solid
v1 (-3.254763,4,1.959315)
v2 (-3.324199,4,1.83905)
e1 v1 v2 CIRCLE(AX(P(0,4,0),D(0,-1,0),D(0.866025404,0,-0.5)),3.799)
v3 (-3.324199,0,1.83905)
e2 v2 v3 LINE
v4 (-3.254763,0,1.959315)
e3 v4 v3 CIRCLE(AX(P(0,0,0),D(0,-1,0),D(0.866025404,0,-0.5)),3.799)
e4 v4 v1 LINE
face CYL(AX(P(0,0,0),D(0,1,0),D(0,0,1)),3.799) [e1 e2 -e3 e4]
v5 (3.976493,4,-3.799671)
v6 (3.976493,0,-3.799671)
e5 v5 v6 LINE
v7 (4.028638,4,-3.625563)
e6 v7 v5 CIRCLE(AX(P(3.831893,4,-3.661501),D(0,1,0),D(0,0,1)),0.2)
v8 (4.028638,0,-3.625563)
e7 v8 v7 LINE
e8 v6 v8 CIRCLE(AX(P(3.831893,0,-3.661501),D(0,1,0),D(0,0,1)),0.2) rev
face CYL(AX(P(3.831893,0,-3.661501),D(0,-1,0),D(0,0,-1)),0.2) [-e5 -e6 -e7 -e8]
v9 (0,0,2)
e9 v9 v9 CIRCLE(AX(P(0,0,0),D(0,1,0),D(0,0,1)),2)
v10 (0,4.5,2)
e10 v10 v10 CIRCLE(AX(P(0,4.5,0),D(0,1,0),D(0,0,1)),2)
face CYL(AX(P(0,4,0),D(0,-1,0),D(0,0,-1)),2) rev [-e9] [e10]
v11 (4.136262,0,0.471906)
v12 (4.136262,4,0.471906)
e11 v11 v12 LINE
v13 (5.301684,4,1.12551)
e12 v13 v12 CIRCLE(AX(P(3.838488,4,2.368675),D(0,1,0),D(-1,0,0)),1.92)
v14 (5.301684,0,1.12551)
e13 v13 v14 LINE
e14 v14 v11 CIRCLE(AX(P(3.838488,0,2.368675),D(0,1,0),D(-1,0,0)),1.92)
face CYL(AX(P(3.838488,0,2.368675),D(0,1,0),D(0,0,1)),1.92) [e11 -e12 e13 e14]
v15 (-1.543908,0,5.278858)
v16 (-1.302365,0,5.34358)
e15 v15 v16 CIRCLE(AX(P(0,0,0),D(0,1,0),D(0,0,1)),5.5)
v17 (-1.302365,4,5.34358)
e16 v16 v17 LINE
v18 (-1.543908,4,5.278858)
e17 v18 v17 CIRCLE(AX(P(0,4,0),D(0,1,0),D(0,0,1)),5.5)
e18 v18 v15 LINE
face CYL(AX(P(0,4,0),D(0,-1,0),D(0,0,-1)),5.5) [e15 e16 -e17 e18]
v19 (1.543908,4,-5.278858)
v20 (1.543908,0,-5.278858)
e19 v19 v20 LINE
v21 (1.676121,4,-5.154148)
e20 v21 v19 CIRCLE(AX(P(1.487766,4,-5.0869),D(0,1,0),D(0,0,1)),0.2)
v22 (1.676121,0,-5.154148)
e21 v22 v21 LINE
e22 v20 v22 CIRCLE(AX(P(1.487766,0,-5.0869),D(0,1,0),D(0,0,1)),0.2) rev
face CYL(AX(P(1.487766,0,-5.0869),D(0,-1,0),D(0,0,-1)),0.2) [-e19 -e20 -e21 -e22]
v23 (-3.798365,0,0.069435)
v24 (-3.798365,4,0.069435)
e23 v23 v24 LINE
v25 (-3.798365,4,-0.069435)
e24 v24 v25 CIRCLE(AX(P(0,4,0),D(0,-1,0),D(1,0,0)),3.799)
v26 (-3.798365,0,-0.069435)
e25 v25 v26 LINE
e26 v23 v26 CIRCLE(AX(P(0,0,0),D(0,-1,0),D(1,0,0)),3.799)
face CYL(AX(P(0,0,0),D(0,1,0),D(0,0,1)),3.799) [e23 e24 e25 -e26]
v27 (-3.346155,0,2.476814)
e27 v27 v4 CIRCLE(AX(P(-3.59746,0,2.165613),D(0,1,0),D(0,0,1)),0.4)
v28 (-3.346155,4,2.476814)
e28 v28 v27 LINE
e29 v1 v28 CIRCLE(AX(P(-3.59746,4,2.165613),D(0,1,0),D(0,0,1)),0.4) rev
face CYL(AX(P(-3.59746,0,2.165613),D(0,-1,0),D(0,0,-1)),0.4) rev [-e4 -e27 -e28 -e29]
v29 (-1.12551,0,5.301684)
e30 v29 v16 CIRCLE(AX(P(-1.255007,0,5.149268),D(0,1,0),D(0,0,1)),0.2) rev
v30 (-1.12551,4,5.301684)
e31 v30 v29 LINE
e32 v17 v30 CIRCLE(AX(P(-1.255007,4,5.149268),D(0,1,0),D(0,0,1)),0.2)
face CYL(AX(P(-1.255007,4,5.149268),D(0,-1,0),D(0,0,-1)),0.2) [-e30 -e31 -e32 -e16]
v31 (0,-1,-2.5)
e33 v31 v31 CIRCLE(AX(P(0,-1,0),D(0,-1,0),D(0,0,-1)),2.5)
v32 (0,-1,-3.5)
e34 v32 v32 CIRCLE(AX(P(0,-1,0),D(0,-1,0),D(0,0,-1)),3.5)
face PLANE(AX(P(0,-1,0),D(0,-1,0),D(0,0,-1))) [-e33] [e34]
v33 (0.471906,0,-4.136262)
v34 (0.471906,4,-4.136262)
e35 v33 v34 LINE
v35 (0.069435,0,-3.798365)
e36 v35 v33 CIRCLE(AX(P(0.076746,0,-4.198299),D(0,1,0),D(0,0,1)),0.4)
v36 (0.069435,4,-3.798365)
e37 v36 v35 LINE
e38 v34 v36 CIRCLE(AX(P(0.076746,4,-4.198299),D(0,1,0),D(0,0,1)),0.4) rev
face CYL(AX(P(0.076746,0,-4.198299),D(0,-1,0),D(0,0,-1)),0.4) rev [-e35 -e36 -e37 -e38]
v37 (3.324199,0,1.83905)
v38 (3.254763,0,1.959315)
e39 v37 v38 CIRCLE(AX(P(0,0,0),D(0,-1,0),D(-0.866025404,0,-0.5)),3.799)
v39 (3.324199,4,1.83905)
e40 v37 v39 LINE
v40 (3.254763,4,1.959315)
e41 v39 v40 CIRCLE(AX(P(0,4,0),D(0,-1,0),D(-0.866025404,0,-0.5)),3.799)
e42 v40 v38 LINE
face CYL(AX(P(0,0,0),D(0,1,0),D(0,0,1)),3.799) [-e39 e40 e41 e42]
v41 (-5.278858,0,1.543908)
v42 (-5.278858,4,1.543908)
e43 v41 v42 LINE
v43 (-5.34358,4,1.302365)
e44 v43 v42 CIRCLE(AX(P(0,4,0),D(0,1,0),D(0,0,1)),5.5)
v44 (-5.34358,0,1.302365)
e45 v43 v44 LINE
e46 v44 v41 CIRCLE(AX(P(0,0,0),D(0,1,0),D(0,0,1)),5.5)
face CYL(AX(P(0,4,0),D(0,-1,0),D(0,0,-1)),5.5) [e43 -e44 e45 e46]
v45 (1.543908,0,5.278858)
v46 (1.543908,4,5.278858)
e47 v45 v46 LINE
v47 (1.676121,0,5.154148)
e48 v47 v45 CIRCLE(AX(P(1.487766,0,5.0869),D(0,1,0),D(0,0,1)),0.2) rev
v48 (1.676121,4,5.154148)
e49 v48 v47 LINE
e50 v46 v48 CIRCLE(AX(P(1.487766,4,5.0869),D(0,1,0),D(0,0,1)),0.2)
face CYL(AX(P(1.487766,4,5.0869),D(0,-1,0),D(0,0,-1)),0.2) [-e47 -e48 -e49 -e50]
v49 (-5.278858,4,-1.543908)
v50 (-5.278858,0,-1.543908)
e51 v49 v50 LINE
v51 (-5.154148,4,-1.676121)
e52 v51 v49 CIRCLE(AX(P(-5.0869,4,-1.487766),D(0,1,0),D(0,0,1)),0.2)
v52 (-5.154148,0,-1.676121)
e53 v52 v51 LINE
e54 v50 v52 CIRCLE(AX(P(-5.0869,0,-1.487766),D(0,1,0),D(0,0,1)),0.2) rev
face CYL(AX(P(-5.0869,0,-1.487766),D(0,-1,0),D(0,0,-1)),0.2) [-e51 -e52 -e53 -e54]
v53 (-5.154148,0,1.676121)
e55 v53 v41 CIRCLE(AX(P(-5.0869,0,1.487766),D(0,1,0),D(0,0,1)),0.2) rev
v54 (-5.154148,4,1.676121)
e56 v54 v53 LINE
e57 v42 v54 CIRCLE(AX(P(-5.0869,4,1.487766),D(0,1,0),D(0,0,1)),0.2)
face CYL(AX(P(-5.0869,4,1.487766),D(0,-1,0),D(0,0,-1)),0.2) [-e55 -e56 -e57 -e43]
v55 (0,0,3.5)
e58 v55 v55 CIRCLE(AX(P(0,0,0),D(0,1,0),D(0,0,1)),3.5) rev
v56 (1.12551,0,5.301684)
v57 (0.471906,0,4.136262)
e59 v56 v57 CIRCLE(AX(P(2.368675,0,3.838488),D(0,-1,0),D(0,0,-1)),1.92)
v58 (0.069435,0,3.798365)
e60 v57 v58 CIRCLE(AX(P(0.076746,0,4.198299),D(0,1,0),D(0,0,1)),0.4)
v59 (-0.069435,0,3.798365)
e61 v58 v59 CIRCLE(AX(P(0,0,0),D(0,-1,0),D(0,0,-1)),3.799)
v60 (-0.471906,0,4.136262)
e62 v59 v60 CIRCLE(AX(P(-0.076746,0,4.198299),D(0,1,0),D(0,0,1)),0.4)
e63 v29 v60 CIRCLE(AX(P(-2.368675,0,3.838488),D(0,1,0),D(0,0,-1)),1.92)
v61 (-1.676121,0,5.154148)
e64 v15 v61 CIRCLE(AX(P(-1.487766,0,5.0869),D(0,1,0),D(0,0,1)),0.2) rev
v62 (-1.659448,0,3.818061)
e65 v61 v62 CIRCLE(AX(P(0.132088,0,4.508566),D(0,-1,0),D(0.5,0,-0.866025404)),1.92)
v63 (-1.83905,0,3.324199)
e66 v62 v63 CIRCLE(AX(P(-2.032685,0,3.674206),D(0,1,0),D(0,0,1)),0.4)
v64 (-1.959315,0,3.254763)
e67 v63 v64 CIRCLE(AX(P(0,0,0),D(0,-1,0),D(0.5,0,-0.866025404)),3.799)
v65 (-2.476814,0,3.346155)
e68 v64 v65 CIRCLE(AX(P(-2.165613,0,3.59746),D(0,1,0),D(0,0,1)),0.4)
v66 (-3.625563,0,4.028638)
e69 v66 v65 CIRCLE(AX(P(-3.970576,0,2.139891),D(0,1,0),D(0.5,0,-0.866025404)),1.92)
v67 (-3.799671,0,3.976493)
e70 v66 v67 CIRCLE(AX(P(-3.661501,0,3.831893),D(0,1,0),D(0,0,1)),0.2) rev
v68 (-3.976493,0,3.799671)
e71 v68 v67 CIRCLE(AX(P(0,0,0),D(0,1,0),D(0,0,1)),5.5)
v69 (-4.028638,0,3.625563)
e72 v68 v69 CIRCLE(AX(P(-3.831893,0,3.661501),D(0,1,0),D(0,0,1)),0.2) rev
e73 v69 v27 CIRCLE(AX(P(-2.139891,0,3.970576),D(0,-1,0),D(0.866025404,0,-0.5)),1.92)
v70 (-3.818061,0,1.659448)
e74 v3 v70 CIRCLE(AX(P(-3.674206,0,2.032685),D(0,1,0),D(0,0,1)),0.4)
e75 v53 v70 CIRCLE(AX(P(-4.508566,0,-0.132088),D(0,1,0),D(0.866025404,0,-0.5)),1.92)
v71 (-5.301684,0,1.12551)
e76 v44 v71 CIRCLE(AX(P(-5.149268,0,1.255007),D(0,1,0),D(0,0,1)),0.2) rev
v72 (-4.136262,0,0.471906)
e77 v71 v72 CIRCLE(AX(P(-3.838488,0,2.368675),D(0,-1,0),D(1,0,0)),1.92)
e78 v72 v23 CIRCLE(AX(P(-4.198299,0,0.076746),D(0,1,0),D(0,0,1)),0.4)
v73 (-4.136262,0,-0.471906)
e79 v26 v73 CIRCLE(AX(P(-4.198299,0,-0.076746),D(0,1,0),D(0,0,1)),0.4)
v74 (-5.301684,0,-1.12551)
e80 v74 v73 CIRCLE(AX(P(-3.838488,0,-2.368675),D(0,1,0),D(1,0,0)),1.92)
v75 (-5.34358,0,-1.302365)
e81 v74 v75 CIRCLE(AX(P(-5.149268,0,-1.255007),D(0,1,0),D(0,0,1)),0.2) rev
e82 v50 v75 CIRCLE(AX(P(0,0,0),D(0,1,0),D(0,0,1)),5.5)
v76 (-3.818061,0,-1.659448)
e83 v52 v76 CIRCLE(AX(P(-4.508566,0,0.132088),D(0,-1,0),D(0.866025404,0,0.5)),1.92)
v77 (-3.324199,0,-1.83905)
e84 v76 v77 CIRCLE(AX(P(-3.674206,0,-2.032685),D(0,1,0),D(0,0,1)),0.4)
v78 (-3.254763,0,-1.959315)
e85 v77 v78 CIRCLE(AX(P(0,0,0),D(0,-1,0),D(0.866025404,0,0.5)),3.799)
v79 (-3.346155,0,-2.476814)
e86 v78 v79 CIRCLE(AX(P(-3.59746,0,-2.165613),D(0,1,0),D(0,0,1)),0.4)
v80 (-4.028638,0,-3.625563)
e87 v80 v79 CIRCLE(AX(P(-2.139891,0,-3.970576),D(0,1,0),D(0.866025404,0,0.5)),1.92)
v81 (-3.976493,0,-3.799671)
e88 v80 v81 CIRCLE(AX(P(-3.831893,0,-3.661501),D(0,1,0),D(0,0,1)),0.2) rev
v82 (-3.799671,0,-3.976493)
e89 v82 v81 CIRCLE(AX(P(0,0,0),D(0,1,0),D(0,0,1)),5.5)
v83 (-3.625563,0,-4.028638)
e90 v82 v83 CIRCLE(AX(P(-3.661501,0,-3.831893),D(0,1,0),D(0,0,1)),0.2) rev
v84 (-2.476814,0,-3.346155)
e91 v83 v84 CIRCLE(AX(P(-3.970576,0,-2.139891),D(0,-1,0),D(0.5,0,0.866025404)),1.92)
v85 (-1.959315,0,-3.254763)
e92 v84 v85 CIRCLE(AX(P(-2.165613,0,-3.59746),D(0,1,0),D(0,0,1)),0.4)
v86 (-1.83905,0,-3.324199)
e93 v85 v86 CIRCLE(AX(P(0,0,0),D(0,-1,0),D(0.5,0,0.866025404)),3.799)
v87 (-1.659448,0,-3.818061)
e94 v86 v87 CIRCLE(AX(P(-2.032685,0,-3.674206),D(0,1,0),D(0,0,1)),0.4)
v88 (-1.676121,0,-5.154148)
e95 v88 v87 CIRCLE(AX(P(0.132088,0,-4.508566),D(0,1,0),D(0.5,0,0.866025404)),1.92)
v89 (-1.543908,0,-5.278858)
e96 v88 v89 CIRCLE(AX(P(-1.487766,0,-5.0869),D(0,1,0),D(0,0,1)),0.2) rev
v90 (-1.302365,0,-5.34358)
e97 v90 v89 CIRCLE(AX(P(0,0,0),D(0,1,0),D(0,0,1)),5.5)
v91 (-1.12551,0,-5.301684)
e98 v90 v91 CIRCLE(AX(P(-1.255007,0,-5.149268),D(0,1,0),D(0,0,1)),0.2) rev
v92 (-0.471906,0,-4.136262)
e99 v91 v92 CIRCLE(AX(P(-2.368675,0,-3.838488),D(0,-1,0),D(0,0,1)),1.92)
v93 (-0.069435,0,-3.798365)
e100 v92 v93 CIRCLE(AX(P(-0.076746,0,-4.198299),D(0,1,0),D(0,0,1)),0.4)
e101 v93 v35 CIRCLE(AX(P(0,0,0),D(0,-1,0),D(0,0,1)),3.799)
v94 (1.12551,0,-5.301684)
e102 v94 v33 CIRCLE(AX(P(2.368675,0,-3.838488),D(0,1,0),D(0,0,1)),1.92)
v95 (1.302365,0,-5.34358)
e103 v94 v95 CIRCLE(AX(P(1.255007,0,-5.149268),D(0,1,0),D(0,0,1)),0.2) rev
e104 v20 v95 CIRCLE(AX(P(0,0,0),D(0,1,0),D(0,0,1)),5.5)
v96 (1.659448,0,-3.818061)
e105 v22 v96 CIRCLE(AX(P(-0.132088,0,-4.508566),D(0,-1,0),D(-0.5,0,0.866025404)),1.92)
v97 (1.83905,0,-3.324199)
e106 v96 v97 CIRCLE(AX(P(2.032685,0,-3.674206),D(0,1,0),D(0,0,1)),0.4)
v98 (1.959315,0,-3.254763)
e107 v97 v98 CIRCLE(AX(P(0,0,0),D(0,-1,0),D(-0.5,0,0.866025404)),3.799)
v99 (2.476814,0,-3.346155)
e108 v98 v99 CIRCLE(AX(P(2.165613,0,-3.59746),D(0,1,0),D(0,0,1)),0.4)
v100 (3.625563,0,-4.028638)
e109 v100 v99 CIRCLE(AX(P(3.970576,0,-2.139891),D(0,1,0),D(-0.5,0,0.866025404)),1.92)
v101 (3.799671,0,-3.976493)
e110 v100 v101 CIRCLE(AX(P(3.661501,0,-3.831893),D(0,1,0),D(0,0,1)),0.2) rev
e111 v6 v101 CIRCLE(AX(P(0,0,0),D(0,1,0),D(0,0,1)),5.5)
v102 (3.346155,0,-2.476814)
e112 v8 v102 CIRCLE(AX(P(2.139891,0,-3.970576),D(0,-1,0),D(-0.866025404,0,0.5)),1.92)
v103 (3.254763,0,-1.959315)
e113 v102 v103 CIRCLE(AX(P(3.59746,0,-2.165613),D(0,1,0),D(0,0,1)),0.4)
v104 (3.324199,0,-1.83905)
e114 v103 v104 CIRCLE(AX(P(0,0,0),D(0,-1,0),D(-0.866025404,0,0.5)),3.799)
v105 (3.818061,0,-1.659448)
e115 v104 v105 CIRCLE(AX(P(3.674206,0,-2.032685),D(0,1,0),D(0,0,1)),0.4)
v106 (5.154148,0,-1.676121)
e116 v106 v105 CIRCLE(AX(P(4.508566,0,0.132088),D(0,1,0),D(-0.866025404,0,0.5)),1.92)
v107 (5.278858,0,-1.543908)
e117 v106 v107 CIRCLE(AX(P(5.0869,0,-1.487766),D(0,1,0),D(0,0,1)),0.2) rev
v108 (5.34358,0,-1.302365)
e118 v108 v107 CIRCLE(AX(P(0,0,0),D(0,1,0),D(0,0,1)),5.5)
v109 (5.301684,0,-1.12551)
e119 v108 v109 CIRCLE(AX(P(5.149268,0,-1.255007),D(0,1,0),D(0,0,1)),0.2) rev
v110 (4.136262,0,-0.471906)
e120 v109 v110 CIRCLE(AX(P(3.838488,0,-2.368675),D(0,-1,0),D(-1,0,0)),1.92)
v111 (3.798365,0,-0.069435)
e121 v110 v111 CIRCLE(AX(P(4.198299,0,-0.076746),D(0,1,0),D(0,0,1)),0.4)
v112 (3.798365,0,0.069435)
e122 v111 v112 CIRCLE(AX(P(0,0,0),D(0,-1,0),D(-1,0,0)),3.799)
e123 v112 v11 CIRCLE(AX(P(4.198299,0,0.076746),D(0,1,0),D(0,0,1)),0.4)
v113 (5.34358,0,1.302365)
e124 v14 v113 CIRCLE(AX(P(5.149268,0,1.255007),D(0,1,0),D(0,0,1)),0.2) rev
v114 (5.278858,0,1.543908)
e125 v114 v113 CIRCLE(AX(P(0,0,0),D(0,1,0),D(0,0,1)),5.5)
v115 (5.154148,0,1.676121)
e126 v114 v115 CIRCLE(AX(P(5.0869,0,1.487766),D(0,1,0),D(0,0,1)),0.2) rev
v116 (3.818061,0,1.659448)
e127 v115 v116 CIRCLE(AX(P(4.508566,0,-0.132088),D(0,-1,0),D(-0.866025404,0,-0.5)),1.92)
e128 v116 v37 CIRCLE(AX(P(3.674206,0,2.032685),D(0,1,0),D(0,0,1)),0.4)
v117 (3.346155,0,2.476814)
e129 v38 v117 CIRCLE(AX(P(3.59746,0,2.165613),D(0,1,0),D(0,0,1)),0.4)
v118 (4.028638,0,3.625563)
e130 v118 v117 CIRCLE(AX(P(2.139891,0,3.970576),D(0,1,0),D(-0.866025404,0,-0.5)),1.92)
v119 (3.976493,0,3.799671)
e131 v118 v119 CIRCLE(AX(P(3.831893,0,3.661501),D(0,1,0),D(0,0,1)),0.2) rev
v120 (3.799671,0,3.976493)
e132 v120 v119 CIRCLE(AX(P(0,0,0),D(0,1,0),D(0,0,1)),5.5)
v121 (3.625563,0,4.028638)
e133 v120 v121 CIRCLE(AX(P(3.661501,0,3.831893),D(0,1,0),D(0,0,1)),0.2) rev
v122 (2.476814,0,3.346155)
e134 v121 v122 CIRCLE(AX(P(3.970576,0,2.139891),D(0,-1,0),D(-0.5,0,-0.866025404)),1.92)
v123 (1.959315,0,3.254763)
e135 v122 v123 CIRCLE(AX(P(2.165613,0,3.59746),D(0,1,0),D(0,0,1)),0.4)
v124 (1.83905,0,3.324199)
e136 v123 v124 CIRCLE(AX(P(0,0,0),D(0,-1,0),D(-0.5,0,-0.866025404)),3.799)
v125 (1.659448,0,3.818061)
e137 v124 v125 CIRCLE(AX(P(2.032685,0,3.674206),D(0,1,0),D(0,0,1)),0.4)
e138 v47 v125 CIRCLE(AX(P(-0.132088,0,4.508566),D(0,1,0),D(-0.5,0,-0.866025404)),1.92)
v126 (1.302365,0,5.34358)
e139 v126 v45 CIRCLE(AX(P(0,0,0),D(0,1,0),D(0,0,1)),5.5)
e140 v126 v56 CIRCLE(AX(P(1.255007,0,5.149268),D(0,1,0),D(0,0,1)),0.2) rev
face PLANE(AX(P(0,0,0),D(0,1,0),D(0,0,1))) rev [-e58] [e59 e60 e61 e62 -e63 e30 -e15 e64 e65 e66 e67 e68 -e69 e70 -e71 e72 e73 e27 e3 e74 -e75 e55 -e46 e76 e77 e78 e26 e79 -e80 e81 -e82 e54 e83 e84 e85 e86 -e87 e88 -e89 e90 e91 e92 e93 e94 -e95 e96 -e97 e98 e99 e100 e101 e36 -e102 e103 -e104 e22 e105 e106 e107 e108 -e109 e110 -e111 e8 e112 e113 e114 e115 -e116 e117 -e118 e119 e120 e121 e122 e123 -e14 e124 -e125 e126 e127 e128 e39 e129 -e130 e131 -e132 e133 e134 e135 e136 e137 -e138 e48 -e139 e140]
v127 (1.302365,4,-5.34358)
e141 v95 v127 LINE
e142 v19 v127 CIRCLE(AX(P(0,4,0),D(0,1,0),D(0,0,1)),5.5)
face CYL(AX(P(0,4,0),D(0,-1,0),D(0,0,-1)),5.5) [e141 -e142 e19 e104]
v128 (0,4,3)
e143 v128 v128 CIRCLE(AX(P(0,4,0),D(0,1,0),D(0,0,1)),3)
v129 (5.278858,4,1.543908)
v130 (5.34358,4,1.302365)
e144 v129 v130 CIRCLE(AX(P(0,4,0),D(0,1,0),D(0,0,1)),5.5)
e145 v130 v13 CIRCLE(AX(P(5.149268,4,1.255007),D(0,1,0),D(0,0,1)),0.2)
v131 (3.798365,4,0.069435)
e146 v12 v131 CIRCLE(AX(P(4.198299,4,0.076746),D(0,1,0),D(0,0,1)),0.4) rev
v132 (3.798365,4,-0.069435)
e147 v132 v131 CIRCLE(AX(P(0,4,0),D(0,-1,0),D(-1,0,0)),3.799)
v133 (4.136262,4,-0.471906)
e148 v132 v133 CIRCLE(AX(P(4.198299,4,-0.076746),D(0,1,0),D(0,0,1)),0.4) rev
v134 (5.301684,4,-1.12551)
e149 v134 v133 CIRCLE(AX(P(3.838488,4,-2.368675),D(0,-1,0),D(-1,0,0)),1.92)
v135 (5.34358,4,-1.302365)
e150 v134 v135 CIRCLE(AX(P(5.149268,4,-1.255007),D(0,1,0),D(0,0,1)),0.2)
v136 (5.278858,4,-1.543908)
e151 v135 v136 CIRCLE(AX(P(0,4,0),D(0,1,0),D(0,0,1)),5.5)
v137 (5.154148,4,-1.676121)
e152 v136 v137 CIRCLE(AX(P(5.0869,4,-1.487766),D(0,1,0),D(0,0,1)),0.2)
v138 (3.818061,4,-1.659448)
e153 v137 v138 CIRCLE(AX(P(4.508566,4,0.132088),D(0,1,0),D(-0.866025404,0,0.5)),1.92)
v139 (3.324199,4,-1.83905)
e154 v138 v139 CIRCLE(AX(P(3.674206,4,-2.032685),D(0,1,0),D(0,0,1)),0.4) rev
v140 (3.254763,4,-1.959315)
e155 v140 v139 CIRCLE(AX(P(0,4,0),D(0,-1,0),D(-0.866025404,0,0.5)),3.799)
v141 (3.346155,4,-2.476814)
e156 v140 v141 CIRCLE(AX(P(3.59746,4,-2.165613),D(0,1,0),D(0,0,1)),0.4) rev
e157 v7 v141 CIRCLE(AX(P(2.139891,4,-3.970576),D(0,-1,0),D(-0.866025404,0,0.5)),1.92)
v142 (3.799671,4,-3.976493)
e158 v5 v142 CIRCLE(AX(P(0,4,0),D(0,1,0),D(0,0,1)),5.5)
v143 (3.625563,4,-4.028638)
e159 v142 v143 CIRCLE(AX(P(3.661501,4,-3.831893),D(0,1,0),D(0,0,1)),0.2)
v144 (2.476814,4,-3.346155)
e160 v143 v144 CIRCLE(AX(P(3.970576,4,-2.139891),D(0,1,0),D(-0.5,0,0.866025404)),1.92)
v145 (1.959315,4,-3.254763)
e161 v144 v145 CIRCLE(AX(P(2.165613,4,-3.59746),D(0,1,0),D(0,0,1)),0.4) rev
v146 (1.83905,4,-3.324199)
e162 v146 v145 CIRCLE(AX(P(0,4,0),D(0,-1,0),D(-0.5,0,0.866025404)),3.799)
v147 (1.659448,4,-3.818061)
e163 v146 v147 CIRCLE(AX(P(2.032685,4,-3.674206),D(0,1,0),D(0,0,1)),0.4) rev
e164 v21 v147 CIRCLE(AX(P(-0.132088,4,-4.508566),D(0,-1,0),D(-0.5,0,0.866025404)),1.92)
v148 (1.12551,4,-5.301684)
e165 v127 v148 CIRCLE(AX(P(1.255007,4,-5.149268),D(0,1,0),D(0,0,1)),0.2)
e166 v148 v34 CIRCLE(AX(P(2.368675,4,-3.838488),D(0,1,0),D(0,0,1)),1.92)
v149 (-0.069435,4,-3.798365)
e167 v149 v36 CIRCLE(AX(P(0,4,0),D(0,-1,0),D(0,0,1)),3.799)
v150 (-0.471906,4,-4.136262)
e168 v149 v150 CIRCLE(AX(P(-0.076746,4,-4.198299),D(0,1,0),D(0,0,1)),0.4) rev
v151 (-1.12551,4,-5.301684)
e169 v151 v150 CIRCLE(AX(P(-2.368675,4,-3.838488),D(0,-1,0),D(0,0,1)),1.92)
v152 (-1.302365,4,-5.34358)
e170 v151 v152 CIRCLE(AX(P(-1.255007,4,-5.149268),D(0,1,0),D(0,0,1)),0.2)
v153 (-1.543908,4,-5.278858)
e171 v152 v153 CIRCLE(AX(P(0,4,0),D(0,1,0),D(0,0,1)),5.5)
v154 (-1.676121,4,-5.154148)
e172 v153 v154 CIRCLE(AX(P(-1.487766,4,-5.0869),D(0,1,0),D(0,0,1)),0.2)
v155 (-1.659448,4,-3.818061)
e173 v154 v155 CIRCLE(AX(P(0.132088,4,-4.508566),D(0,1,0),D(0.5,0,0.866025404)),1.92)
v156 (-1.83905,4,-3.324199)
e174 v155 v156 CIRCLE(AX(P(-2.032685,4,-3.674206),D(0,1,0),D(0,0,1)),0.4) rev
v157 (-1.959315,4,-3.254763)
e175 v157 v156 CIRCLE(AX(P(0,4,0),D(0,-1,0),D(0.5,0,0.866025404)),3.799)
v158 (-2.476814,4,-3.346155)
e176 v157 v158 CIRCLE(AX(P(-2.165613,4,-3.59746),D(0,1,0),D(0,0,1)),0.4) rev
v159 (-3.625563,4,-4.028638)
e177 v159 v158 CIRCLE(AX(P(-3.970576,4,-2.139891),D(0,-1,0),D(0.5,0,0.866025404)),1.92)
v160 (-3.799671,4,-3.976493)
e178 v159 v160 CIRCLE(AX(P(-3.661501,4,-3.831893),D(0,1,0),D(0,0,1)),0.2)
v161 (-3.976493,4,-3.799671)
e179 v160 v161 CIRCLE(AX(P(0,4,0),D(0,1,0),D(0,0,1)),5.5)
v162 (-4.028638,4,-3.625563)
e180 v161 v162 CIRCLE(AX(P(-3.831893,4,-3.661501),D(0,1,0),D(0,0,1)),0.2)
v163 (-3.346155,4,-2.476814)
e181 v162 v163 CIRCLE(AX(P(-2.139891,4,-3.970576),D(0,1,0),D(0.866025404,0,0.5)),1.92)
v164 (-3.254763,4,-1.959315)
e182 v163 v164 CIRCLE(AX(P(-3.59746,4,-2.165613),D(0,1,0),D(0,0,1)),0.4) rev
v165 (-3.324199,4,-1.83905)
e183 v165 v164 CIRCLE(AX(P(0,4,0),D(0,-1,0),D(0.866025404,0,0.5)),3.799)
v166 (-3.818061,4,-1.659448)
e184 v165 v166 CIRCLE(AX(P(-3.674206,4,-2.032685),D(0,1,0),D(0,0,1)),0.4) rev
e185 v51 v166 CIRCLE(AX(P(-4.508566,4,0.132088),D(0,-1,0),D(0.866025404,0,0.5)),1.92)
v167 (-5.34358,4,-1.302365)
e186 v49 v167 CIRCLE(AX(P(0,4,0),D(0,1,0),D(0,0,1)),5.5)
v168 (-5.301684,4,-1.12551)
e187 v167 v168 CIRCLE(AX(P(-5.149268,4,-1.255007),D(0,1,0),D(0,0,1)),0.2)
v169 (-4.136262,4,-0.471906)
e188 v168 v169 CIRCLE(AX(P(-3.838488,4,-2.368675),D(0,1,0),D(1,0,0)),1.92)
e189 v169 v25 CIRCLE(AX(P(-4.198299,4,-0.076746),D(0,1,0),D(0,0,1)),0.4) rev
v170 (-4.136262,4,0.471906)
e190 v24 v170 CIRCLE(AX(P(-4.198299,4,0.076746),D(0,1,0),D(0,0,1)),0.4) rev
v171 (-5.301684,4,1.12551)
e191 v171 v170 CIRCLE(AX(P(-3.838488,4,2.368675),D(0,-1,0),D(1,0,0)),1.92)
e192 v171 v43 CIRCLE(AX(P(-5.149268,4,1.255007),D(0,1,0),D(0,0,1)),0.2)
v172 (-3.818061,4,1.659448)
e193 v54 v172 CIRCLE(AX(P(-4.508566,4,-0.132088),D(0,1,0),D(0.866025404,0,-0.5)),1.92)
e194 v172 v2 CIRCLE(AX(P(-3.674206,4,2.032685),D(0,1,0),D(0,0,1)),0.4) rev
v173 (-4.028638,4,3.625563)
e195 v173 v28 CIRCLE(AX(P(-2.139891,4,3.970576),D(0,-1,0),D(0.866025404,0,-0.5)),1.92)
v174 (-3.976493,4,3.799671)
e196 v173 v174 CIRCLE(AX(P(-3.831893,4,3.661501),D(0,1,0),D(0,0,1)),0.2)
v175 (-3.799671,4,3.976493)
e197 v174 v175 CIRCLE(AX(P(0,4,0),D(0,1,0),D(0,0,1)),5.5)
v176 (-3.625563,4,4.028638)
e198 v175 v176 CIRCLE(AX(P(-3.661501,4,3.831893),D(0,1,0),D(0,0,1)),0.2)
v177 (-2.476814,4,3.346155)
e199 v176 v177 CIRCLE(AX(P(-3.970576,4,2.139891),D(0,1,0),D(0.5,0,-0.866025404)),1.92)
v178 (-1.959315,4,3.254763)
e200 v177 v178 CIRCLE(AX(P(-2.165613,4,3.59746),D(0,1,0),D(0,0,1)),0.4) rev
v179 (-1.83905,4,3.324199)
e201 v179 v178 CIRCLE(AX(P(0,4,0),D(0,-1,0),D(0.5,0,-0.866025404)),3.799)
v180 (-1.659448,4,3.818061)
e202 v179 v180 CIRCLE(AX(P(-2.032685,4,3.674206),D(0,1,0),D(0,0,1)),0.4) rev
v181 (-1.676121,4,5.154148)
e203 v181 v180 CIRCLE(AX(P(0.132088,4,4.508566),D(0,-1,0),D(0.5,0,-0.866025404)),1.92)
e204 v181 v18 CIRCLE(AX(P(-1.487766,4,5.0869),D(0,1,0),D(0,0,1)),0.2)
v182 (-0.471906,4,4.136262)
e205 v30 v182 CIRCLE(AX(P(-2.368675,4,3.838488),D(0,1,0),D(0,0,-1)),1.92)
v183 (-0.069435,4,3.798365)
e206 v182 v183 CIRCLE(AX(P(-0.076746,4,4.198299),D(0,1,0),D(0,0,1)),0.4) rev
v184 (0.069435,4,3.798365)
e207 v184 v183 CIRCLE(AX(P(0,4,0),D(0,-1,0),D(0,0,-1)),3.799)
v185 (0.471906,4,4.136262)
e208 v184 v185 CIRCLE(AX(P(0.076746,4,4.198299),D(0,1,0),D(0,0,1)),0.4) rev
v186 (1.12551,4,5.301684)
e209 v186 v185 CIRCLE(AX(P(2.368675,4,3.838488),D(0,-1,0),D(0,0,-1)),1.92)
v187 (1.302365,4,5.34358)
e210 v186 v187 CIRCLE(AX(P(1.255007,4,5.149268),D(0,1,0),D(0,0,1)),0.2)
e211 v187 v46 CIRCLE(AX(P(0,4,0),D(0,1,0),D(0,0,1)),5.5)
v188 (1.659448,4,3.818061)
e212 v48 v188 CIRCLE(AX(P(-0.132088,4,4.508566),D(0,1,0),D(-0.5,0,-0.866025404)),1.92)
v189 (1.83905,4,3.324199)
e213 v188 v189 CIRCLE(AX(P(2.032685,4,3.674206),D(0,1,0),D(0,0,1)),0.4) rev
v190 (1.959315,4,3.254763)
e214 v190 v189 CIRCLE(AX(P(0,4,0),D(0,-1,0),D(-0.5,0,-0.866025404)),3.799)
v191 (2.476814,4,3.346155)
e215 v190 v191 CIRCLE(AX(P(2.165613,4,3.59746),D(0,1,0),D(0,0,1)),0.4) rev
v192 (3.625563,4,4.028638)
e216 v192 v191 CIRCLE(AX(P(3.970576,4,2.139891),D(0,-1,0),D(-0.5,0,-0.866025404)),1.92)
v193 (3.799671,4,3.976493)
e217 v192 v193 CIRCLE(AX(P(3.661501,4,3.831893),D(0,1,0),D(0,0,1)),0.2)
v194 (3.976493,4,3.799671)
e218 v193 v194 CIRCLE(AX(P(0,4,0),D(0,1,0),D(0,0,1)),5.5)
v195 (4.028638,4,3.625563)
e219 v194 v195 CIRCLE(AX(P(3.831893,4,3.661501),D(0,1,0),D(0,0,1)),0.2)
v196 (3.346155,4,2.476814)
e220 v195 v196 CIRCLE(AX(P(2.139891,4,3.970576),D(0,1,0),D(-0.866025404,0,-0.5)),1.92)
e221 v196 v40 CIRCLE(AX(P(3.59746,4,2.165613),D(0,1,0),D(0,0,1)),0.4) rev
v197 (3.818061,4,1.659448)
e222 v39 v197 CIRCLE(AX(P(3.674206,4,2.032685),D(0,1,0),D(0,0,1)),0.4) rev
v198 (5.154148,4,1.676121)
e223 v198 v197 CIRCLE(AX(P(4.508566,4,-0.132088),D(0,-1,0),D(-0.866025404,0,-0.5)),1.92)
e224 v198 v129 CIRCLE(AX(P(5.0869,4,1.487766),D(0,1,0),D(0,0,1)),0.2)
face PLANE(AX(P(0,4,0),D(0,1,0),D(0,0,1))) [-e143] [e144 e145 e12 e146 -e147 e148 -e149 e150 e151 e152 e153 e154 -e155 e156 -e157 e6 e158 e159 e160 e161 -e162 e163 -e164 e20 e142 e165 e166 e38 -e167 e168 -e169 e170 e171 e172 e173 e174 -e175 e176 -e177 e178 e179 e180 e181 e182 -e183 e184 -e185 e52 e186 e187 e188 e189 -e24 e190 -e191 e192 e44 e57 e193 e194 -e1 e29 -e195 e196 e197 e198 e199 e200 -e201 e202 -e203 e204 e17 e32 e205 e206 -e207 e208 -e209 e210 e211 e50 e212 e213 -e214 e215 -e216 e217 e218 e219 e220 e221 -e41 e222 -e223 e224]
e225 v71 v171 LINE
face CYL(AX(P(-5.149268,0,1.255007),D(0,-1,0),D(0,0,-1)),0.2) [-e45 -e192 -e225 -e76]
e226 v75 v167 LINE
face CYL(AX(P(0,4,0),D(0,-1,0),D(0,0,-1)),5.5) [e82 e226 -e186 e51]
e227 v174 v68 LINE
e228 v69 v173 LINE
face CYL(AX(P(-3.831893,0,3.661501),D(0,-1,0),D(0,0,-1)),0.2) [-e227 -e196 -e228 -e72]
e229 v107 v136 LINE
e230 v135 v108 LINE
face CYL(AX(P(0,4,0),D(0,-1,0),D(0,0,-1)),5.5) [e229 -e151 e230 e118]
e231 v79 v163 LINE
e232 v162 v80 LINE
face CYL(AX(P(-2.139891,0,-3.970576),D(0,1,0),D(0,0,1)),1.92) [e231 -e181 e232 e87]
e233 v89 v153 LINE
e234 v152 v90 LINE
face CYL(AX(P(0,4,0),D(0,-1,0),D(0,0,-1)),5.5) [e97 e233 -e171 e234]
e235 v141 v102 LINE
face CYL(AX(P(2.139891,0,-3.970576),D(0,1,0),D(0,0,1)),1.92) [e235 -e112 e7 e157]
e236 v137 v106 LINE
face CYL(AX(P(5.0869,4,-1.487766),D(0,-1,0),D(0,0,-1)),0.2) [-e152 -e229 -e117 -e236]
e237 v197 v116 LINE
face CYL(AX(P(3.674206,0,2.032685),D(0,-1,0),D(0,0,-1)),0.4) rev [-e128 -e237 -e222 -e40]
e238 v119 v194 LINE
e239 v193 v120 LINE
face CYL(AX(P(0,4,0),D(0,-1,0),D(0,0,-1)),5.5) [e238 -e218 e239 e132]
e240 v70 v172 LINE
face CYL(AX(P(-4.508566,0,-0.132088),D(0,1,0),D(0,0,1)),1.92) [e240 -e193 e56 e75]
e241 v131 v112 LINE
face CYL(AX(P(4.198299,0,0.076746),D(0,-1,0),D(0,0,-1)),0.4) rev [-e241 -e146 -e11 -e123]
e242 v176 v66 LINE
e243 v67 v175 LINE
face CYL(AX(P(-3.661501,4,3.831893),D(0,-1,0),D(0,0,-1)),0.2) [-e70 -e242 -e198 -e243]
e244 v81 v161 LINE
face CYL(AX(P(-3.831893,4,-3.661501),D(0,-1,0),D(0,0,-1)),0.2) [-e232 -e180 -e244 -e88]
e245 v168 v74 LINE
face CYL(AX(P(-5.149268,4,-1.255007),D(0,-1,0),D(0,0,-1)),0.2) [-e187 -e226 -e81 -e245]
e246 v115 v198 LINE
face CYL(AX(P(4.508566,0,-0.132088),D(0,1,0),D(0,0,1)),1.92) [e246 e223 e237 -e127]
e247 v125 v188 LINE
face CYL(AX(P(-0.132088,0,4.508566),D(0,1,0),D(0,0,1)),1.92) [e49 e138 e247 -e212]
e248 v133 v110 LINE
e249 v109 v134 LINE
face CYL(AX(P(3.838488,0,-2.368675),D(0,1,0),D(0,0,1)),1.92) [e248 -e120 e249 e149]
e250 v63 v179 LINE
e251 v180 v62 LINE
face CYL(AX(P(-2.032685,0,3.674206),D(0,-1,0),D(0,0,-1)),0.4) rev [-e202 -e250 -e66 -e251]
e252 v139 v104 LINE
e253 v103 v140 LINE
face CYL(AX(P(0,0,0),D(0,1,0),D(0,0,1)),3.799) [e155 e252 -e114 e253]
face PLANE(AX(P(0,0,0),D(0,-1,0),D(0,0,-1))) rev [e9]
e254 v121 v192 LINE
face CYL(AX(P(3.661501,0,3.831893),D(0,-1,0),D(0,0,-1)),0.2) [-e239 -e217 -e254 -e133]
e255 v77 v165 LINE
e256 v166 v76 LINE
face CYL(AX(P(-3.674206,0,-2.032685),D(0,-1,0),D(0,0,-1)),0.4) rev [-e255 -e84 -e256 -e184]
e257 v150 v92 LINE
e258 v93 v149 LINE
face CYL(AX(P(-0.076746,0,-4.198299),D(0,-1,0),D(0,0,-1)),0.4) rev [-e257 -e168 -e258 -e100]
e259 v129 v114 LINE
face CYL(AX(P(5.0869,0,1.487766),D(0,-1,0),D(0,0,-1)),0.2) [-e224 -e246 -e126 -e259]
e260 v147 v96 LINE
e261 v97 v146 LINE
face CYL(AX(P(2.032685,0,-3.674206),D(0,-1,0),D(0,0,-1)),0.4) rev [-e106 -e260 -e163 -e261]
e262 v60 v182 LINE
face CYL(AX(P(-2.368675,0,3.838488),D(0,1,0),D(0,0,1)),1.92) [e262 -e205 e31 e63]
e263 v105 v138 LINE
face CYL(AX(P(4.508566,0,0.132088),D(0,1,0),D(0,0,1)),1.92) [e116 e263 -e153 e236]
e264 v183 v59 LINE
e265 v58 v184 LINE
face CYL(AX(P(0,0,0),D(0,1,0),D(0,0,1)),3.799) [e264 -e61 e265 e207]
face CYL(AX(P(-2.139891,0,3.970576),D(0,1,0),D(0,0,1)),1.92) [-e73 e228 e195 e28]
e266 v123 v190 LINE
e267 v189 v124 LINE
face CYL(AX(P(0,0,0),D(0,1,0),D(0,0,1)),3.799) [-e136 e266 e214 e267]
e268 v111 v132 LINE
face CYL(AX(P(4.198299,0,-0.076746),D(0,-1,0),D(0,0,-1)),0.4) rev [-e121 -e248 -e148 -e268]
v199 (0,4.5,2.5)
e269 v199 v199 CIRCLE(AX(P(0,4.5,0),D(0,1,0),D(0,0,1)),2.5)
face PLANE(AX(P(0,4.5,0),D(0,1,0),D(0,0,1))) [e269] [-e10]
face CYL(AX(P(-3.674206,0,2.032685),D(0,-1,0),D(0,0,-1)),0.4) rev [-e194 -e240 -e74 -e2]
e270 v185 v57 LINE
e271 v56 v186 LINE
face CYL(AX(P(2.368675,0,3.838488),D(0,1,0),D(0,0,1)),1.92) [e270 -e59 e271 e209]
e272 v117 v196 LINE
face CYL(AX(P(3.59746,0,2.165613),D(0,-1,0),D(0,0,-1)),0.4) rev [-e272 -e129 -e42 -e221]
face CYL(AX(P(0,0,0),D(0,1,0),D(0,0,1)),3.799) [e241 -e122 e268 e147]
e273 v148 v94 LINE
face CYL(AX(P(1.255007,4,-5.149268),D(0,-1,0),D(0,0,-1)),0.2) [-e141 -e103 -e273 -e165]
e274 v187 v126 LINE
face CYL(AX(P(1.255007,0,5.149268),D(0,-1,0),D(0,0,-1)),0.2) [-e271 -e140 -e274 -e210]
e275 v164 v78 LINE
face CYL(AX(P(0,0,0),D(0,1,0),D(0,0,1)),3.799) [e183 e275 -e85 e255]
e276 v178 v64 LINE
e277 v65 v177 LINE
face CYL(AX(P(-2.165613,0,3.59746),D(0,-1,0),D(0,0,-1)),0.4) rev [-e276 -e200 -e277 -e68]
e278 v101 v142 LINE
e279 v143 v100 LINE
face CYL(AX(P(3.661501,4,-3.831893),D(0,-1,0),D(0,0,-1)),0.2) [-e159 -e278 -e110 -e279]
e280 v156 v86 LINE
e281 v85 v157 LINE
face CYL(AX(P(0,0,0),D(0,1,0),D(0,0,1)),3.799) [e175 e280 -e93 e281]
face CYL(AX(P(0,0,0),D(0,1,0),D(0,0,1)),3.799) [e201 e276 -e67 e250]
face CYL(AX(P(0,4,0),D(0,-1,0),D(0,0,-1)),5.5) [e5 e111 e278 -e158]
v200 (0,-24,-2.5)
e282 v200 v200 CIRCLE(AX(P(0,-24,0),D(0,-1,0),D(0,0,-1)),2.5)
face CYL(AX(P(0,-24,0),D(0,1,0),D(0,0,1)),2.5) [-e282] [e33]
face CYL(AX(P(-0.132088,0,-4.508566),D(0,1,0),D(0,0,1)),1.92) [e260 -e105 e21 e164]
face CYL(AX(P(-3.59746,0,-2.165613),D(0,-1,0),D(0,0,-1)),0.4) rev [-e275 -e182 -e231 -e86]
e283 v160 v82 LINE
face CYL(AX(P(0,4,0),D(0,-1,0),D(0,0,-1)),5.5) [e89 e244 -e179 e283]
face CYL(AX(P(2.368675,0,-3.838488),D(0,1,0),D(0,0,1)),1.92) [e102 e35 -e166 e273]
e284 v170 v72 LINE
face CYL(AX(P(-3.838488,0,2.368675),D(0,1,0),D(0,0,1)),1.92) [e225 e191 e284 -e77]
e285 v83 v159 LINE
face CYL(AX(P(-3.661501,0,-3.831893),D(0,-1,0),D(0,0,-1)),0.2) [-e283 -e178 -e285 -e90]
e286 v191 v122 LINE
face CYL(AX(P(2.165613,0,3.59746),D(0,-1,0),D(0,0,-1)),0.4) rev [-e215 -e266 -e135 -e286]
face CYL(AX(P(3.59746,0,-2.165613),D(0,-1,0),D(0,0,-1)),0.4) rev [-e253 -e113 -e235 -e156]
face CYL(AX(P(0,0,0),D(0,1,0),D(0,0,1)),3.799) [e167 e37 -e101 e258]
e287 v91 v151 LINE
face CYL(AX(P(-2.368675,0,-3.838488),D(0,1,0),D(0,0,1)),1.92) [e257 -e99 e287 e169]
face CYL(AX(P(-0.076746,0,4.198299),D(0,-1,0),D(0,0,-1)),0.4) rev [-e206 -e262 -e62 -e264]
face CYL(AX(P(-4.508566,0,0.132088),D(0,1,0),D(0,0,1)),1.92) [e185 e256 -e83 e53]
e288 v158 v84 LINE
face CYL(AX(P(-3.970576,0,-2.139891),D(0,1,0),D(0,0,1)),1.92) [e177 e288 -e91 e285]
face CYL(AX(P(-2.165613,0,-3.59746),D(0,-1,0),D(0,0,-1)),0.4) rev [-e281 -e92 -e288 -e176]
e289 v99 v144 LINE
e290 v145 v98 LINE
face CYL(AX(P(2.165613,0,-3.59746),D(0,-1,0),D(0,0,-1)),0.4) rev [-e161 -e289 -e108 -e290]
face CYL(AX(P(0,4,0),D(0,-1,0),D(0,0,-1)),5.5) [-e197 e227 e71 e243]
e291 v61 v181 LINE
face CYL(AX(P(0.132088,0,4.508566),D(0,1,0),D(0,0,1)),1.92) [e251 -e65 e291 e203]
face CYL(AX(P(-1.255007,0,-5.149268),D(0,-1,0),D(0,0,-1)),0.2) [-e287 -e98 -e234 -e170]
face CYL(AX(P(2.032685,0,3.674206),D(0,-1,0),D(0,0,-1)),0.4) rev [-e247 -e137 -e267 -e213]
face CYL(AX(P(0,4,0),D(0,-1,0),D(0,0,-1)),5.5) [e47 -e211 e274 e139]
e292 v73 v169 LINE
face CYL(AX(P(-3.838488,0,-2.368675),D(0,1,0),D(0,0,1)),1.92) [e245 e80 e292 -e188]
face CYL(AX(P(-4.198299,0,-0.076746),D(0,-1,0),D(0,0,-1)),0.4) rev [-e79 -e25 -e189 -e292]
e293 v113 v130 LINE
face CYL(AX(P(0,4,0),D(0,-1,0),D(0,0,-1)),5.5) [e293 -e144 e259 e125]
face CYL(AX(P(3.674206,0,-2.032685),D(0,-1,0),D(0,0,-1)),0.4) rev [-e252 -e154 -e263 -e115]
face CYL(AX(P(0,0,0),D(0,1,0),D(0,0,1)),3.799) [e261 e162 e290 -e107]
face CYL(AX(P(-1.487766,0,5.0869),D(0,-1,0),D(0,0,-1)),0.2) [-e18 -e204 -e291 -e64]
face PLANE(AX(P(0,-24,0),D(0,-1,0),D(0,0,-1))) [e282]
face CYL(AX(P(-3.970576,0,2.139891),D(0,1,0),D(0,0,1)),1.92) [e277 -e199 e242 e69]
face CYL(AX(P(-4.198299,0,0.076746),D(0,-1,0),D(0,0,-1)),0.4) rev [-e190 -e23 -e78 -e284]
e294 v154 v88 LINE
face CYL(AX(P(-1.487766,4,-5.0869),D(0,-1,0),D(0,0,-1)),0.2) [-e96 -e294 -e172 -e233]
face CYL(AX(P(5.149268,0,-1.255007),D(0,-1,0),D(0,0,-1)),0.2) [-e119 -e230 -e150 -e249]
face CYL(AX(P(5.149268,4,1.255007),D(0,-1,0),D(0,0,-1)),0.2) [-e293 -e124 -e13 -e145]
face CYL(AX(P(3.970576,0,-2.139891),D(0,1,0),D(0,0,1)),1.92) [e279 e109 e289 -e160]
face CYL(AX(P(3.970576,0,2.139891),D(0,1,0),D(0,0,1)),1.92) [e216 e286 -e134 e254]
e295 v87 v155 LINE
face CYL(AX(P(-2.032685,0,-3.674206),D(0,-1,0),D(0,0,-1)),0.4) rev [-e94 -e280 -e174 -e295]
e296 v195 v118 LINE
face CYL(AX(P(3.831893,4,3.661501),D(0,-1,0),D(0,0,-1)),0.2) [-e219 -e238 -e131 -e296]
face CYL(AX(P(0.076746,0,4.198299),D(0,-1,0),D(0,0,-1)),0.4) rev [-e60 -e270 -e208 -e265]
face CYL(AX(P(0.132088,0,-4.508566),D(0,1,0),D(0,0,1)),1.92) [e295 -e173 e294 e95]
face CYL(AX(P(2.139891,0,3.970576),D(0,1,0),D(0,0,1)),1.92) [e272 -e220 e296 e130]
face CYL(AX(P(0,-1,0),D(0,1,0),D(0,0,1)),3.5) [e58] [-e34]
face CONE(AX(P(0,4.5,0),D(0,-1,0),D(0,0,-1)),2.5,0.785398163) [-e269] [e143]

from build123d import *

# Parameters (mm, degrees)
SKETCH1_R            = 5.5
SKETCH1_R_2          = 2
BOSS_EXTRUDE1_DEPTH  = 4
CUT_EXTRUDE1_DEPTH   = 4
FILLET1_R            = 0.2
FILLET2_R            = 0.4
FILLET1_OF_MIRROR1_R = 0.2
FILLET2_OF_MIRROR1_R = 0.4
CIRPATTERN1_DEPTH    = 4
SKETCH3_R            = 3
SKETCH3_R_2          = 2
BOSS_EXTRUDE2_DEPTH  = 0.5
CHAMFER1_SIZE        = 0.5
SKETCH4_R            = 3.5
BOSS_EXTRUDE3_DEPTH  = 1
SKETCH5_R            = 2.5
BOSS_EXTRUDE4_DEPTH  = 23


# Read off the part's stored shape, not the designer's step: CirPattern1
with BuildPart() as part:
    # Sketch1 → Boss-Extrude1 (new body)
    with BuildSketch(Plane(origin=(0, 0, 0), x_dir=(1, 0, 0), z_dir=(0, 1, 0))):
        with Locations(Location((0, 0, 0), (0, 0, 270))):
            Circle(SKETCH1_R)
        with Locations(Location((0, 0, 0), (0, 0, 270))):
            Circle(SKETCH1_R_2, mode=Mode.SUBTRACT)
    extrude(amount=BOSS_EXTRUDE1_DEPTH)

    # Sketch2 → Cut-Extrude1 (cut)
    with BuildSketch(Plane(origin=(0, 4, 0), x_dir=(1, 0, 0), z_dir=(0, 1, 0))):
        with BuildLine():
            Line((0, 3.799), (0, 7.477315916))
            Line((0, 7.477315916), (-1.717756705, 5.644784223))
            ThreePointArc((-1.717756705, 5.644784223), (-0.778860554, 4.915006115), (-0.449816676, 3.772275965))
            ThreePointArc((-0.449816676, 3.772275965), (-0.225304913, 3.792313106), (0, 3.799))
        make_face()
    cut_extrude1 = extrude(amount=-CUT_EXTRUDE1_DEPTH, mode=Mode.SUBTRACT)

    # Fillet1
    fillet1_edges = [part.edges().sort_by_distance(p)[0] for p in [
        (-1.205722077, 2, -5.366212284),
    ]]
    fillet(fillet1_edges, radius=FILLET1_R)

    # Fillet2
    fillet2_edges = [part.edges().sort_by_distance(p)[0] for p in [
        (-0.449816676, 2, -3.772275965),
    ]]
    fillet(fillet2_edges, radius=FILLET2_R)

    # Mirror1: Cut-Extrude1 across plane
    add(cut_extrude1.mirror(Plane.ZY), mode=Mode.SUBTRACT)

    # Fillet1 of Mirror1
    fillet1_of_mirror1_edges = [part.edges().sort_by_distance(p)[0] for p in [
        (1.205722077, 2, -5.366212284),
    ]]
    fillet(fillet1_of_mirror1_edges, radius=FILLET1_OF_MIRROR1_R)

    # Fillet2 of Mirror1
    fillet2_of_mirror1_edges = [part.edges().sort_by_distance(p)[0] for p in [
        (0.449816676, 2, -3.772275965),
    ]]
    fillet(fillet2_of_mirror1_edges, radius=FILLET2_OF_MIRROR1_R)

    # CirPattern1 outline → CirPattern1 (cut)
    with BuildSketch(Plane(origin=(0, 0, 0), x_dir=(1, 0, 0), z_dir=(0, 1, 0))):
        with BuildLine():
            ThreePointArc((3.62556251, 4.028637884), (3.71888228, 4.023485264), (3.799671329, 3.976493152))
            ThreePointArc((3.799671329, 3.976493152), (2.75, 4.76313972), (1.543908423, 5.278858473))
            ThreePointArc((1.543908423, 5.278858473), (1.62499931, 5.23238916), (1.676121495, 5.154148179))
            ThreePointArc((1.676121495, 5.154148179), (1.787762124, 4.48460755), (1.659448371, 3.81806133))
            ThreePointArc((1.659448371, 3.81806133), (1.656771541, 3.537498856), (1.839050027, 3.32419855))
            ThreePointArc((1.839050027, 3.32419855), (1.8995, 3.290030509), (1.959315378, 3.254763317))
            ThreePointArc((1.959315378, 3.254763317), (2.235178105, 3.203555671), (2.47681392, 3.34615511))
            ThreePointArc((2.47681392, 3.34615511), (2.989903003, 3.79055119), (3.62556251, 4.028637884))
        make_face()
        with BuildLine():
            ThreePointArc((5.154148179, 1.676121495), (5.23238916, 1.62499931), (5.278858473, 1.543908423))
            ThreePointArc((5.278858473, 1.543908423), (4.763139721, 2.75), (3.976493152, 3.799671329))
            ThreePointArc((3.976493152, 3.799671329), (4.023485264, 3.71888228), (4.028637884, 3.62556251))
            ThreePointArc((4.028637884, 3.62556251), (3.79055119, 2.989903003), (3.34615511, 2.47681392))
            ThreePointArc((3.34615511, 2.47681392), (3.203555671, 2.235178105), (3.254763317, 1.959315378))
            ThreePointArc((3.254763317, 1.959315378), (3.290030509, 1.8995), (3.32419855, 1.839050027))
            ThreePointArc((3.32419855, 1.839050027), (3.537498856, 1.656771541), (3.81806133, 1.659448371))
            ThreePointArc((3.81806133, 1.659448371), (4.48460755, 1.787762124), (5.154148179, 1.676121495))
        make_face()
        with BuildLine():
            ThreePointArc((5.301684005, -1.125510295), (5.34388159, -1.208903897), (5.343579752, -1.302365321))
            ThreePointArc((5.343579752, -1.302365321), (5.5, 0), (5.343579752, 1.302365321))
            ThreePointArc((5.343579752, 1.302365321), (5.34388159, 1.208903897), (5.301684005, 1.125510295))
            ThreePointArc((5.301684005, 1.125510295), (4.777665126, 0.69405636), (4.13626229, 0.47190622))
            ThreePointArc((4.13626229, 0.47190622), (3.891949646, 0.333943185), (3.798365405, 0.069435233))
            ThreePointArc((3.798365405, 0.069435233), (3.799, 0), (3.798365405, -0.069435233))
            ThreePointArc((3.798365405, -0.069435233), (3.891949646, -0.333943185), (4.13626229, -0.47190622))
            ThreePointArc((4.13626229, -0.47190622), (4.777665126, -0.69405636), (5.301684005, -1.125510295))
        make_face()
        with BuildLine():
            ThreePointArc((4.028637884, -3.62556251), (4.023485264, -3.71888228), (3.976493152, -3.799671329))
            ThreePointArc((3.976493152, -3.799671329), (4.763139721, -2.75), (5.278858473, -1.543908423))
            ThreePointArc((5.278858473, -1.543908423), (5.23238916, -1.62499931), (5.154148179, -1.676121495))
            ThreePointArc((5.154148179, -1.676121495), (4.48460755, -1.787762124), (3.81806133, -1.659448371))
            ThreePointArc((3.81806133, -1.659448371), (3.537498856, -1.656771541), (3.32419855, -1.839050027))
            ThreePointArc((3.32419855, -1.839050027), (3.290030509, -1.8995), (3.254763317, -1.959315378))
            ThreePointArc((3.254763317, -1.959315378), (3.203555671, -2.235178105), (3.34615511, -2.47681392))
            ThreePointArc((3.34615511, -2.47681392), (3.79055119, -2.989903003), (4.028637884, -3.62556251))
        make_face()
        with BuildLine():
            ThreePointArc((1.676121495, -5.154148179), (1.62499931, -5.23238916), (1.543908423, -5.278858473))
            ThreePointArc((1.543908423, -5.278858473), (2.75, -4.763139721), (3.799671329, -3.976493152))
            ThreePointArc((3.799671329, -3.976493152), (3.71888228, -4.023485264), (3.62556251, -4.028637884))
            ThreePointArc((3.62556251, -4.028637884), (2.989903003, -3.79055119), (2.47681392, -3.34615511))
            ThreePointArc((2.47681392, -3.34615511), (2.235178105, -3.203555671), (1.959315378, -3.254763317))
            ThreePointArc((1.959315378, -3.254763317), (1.8995, -3.290030509), (1.839050027, -3.32419855))
            ThreePointArc((1.839050027, -3.32419855), (1.656771541, -3.537498856), (1.659448371, -3.81806133))
            ThreePointArc((1.659448371, -3.81806133), (1.787762124, -4.48460755), (1.676121495, -5.154148179))
        make_face()
        with BuildLine():
            ThreePointArc((-1.125510295, -5.301684005), (-1.208903897, -5.34388159), (-1.302365321, -5.343579752))
            ThreePointArc((-1.302365321, -5.343579752), (0, -5.5), (1.302365321, -5.343579752))
            ThreePointArc((1.302365321, -5.343579752), (1.208903897, -5.34388159), (1.125510295, -5.301684005))
            ThreePointArc((1.125510295, -5.301684005), (0.69405636, -4.777665126), (0.47190622, -4.13626229))
            ThreePointArc((0.47190622, -4.13626229), (0.333943185, -3.891949646), (0.069435233, -3.798365405))
            ThreePointArc((0.069435233, -3.798365405), (0, -3.799), (-0.069435233, -3.798365405))
            ThreePointArc((-0.069435233, -3.798365405), (-0.333943185, -3.891949646), (-0.47190622, -4.13626229))
            ThreePointArc((-0.47190622, -4.13626229), (-0.69405636, -4.777665126), (-1.125510295, -5.301684005))
        make_face()
        with BuildLine():
            ThreePointArc((-3.62556251, -4.028637884), (-3.71888228, -4.023485264), (-3.799671329, -3.976493152))
            ThreePointArc((-3.799671329, -3.976493152), (-2.75, -4.763139721), (-1.543908423, -5.278858473))
            ThreePointArc((-1.543908423, -5.278858473), (-1.62499931, -5.23238916), (-1.676121495, -5.154148179))
            ThreePointArc((-1.676121495, -5.154148179), (-1.787762124, -4.48460755), (-1.659448371, -3.81806133))
            ThreePointArc((-1.659448371, -3.81806133), (-1.656771541, -3.537498856), (-1.839050027, -3.32419855))
            ThreePointArc((-1.839050027, -3.32419855), (-1.8995, -3.290030509), (-1.959315378, -3.254763317))
            ThreePointArc((-1.959315378, -3.254763317), (-2.235178105, -3.203555671), (-2.47681392, -3.34615511))
            ThreePointArc((-2.47681392, -3.34615511), (-2.989903003, -3.79055119), (-3.62556251, -4.028637884))
        make_face()
        with BuildLine():
            ThreePointArc((-5.154148179, -1.676121495), (-5.23238916, -1.62499931), (-5.278858473, -1.543908423))
            ThreePointArc((-5.278858473, -1.543908423), (-4.763139721, -2.75), (-3.976493152, -3.799671329))
            ThreePointArc((-3.976493152, -3.799671329), (-4.023485264, -3.71888228), (-4.028637884, -3.62556251))
            ThreePointArc((-4.028637884, -3.62556251), (-3.79055119, -2.989903003), (-3.34615511, -2.47681392))
            ThreePointArc((-3.34615511, -2.47681392), (-3.203555671, -2.235178105), (-3.254763317, -1.959315378))
            ThreePointArc((-3.254763317, -1.959315378), (-3.290030509, -1.8995), (-3.32419855, -1.839050027))
            ThreePointArc((-3.32419855, -1.839050027), (-3.537498856, -1.656771541), (-3.81806133, -1.659448371))
            ThreePointArc((-3.81806133, -1.659448371), (-4.48460755, -1.787762124), (-5.154148179, -1.676121495))
        make_face()
        with BuildLine():
            ThreePointArc((-5.301684005, 1.125510295), (-5.34388159, 1.208903897), (-5.343579752, 1.302365321))
            ThreePointArc((-5.343579752, 1.302365321), (-5.5, 0), (-5.343579752, -1.302365321))
            ThreePointArc((-5.343579752, -1.302365321), (-5.34388159, -1.208903897), (-5.301684005, -1.125510295))
            ThreePointArc((-5.301684005, -1.125510295), (-4.777665126, -0.69405636), (-4.13626229, -0.47190622))
            ThreePointArc((-4.13626229, -0.47190622), (-3.891949646, -0.333943185), (-3.798365405, -0.069435233))
            ThreePointArc((-3.798365405, -0.069435233), (-3.799, 0), (-3.798365405, 0.069435233))
            ThreePointArc((-3.798365405, 0.069435233), (-3.891949646, 0.333943185), (-4.13626229, 0.47190622))
            ThreePointArc((-4.13626229, 0.47190622), (-4.777665126, 0.69405636), (-5.301684005, 1.125510295))
        make_face()
        with BuildLine():
            ThreePointArc((-4.028637884, 3.62556251), (-4.023485264, 3.71888228), (-3.976493152, 3.799671329))
            ThreePointArc((-3.976493152, 3.799671329), (-4.763139721, 2.75), (-5.278858473, 1.543908423))
            ThreePointArc((-5.278858473, 1.543908423), (-5.23238916, 1.62499931), (-5.154148179, 1.676121495))
            ThreePointArc((-5.154148179, 1.676121495), (-4.48460755, 1.787762124), (-3.81806133, 1.659448371))
            ThreePointArc((-3.81806133, 1.659448371), (-3.537498856, 1.656771541), (-3.32419855, 1.839050027))
            ThreePointArc((-3.32419855, 1.839050027), (-3.290030509, 1.8995), (-3.254763317, 1.959315378))
            ThreePointArc((-3.254763317, 1.959315378), (-3.203555671, 2.235178105), (-3.34615511, 2.47681392))
            ThreePointArc((-3.34615511, 2.47681392), (-3.79055119, 2.989903003), (-4.028637884, 3.62556251))
        make_face()
        with BuildLine():
            ThreePointArc((-1.959315378, 3.254763317), (-1.8995, 3.290030509), (-1.839050027, 3.32419855))
            ThreePointArc((-1.839050027, 3.32419855), (-1.656771541, 3.537498856), (-1.659448371, 3.81806133))
            ThreePointArc((-1.659448371, 3.81806133), (-1.787762124, 4.48460755), (-1.676121495, 5.154148179))
            ThreePointArc((-1.676121495, 5.154148179), (-1.62499931, 5.23238916), (-1.543908423, 5.278858473))
            ThreePointArc((-1.543908423, 5.278858473), (-2.75, 4.76313972), (-3.799671329, 3.976493152))
            ThreePointArc((-3.799671329, 3.976493152), (-3.71888228, 4.023485264), (-3.62556251, 4.028637884))
            ThreePointArc((-3.62556251, 4.028637884), (-2.989903003, 3.79055119), (-2.47681392, 3.34615511))
            ThreePointArc((-2.47681392, 3.34615511), (-2.235178105, 3.203555671), (-1.959315378, 3.254763317))
        make_face()
    extrude(amount=CIRPATTERN1_DEPTH, mode=Mode.SUBTRACT)

    # Sketch3 → Boss-Extrude2 (add)
    with BuildSketch(Plane(origin=(0, 4, 0), x_dir=(1, 0, 0), z_dir=(0, 1, 0))):
        with Locations(Location((0, 0, 0), (0, 0, 270))):
            Circle(SKETCH3_R)
        with Locations(Location((0, 0, 0), (0, 0, 270))):
            Circle(SKETCH3_R_2, mode=Mode.SUBTRACT)
    extrude(amount=BOSS_EXTRUDE2_DEPTH)

    # Chamfer1
    chamfer1_edges = [part.edges().sort_by_distance(p)[0] for p in [
        (0, 4.5, -3),
    ]]
    chamfer(chamfer1_edges, length=CHAMFER1_SIZE - 0.0001)  # a hair under: the kernel refuses the full size

    # Sketch4 → Boss-Extrude3 (add)
    with BuildSketch(Plane.XZ):
        with Locations(Location((0, 0, 0), (0, 0, 90))):
            Circle(SKETCH4_R)
    extrude(amount=BOSS_EXTRUDE3_DEPTH)

    # Sketch5 → Boss-Extrude4 (add)
    with BuildSketch(Plane.XZ.offset(1)):
        with Locations(Location((0, 0, 0), (0, 0, 270))):
            Circle(SKETCH5_R)
    extrude(amount=BOSS_EXTRUDE4_DEPTH)


solid = part.part
